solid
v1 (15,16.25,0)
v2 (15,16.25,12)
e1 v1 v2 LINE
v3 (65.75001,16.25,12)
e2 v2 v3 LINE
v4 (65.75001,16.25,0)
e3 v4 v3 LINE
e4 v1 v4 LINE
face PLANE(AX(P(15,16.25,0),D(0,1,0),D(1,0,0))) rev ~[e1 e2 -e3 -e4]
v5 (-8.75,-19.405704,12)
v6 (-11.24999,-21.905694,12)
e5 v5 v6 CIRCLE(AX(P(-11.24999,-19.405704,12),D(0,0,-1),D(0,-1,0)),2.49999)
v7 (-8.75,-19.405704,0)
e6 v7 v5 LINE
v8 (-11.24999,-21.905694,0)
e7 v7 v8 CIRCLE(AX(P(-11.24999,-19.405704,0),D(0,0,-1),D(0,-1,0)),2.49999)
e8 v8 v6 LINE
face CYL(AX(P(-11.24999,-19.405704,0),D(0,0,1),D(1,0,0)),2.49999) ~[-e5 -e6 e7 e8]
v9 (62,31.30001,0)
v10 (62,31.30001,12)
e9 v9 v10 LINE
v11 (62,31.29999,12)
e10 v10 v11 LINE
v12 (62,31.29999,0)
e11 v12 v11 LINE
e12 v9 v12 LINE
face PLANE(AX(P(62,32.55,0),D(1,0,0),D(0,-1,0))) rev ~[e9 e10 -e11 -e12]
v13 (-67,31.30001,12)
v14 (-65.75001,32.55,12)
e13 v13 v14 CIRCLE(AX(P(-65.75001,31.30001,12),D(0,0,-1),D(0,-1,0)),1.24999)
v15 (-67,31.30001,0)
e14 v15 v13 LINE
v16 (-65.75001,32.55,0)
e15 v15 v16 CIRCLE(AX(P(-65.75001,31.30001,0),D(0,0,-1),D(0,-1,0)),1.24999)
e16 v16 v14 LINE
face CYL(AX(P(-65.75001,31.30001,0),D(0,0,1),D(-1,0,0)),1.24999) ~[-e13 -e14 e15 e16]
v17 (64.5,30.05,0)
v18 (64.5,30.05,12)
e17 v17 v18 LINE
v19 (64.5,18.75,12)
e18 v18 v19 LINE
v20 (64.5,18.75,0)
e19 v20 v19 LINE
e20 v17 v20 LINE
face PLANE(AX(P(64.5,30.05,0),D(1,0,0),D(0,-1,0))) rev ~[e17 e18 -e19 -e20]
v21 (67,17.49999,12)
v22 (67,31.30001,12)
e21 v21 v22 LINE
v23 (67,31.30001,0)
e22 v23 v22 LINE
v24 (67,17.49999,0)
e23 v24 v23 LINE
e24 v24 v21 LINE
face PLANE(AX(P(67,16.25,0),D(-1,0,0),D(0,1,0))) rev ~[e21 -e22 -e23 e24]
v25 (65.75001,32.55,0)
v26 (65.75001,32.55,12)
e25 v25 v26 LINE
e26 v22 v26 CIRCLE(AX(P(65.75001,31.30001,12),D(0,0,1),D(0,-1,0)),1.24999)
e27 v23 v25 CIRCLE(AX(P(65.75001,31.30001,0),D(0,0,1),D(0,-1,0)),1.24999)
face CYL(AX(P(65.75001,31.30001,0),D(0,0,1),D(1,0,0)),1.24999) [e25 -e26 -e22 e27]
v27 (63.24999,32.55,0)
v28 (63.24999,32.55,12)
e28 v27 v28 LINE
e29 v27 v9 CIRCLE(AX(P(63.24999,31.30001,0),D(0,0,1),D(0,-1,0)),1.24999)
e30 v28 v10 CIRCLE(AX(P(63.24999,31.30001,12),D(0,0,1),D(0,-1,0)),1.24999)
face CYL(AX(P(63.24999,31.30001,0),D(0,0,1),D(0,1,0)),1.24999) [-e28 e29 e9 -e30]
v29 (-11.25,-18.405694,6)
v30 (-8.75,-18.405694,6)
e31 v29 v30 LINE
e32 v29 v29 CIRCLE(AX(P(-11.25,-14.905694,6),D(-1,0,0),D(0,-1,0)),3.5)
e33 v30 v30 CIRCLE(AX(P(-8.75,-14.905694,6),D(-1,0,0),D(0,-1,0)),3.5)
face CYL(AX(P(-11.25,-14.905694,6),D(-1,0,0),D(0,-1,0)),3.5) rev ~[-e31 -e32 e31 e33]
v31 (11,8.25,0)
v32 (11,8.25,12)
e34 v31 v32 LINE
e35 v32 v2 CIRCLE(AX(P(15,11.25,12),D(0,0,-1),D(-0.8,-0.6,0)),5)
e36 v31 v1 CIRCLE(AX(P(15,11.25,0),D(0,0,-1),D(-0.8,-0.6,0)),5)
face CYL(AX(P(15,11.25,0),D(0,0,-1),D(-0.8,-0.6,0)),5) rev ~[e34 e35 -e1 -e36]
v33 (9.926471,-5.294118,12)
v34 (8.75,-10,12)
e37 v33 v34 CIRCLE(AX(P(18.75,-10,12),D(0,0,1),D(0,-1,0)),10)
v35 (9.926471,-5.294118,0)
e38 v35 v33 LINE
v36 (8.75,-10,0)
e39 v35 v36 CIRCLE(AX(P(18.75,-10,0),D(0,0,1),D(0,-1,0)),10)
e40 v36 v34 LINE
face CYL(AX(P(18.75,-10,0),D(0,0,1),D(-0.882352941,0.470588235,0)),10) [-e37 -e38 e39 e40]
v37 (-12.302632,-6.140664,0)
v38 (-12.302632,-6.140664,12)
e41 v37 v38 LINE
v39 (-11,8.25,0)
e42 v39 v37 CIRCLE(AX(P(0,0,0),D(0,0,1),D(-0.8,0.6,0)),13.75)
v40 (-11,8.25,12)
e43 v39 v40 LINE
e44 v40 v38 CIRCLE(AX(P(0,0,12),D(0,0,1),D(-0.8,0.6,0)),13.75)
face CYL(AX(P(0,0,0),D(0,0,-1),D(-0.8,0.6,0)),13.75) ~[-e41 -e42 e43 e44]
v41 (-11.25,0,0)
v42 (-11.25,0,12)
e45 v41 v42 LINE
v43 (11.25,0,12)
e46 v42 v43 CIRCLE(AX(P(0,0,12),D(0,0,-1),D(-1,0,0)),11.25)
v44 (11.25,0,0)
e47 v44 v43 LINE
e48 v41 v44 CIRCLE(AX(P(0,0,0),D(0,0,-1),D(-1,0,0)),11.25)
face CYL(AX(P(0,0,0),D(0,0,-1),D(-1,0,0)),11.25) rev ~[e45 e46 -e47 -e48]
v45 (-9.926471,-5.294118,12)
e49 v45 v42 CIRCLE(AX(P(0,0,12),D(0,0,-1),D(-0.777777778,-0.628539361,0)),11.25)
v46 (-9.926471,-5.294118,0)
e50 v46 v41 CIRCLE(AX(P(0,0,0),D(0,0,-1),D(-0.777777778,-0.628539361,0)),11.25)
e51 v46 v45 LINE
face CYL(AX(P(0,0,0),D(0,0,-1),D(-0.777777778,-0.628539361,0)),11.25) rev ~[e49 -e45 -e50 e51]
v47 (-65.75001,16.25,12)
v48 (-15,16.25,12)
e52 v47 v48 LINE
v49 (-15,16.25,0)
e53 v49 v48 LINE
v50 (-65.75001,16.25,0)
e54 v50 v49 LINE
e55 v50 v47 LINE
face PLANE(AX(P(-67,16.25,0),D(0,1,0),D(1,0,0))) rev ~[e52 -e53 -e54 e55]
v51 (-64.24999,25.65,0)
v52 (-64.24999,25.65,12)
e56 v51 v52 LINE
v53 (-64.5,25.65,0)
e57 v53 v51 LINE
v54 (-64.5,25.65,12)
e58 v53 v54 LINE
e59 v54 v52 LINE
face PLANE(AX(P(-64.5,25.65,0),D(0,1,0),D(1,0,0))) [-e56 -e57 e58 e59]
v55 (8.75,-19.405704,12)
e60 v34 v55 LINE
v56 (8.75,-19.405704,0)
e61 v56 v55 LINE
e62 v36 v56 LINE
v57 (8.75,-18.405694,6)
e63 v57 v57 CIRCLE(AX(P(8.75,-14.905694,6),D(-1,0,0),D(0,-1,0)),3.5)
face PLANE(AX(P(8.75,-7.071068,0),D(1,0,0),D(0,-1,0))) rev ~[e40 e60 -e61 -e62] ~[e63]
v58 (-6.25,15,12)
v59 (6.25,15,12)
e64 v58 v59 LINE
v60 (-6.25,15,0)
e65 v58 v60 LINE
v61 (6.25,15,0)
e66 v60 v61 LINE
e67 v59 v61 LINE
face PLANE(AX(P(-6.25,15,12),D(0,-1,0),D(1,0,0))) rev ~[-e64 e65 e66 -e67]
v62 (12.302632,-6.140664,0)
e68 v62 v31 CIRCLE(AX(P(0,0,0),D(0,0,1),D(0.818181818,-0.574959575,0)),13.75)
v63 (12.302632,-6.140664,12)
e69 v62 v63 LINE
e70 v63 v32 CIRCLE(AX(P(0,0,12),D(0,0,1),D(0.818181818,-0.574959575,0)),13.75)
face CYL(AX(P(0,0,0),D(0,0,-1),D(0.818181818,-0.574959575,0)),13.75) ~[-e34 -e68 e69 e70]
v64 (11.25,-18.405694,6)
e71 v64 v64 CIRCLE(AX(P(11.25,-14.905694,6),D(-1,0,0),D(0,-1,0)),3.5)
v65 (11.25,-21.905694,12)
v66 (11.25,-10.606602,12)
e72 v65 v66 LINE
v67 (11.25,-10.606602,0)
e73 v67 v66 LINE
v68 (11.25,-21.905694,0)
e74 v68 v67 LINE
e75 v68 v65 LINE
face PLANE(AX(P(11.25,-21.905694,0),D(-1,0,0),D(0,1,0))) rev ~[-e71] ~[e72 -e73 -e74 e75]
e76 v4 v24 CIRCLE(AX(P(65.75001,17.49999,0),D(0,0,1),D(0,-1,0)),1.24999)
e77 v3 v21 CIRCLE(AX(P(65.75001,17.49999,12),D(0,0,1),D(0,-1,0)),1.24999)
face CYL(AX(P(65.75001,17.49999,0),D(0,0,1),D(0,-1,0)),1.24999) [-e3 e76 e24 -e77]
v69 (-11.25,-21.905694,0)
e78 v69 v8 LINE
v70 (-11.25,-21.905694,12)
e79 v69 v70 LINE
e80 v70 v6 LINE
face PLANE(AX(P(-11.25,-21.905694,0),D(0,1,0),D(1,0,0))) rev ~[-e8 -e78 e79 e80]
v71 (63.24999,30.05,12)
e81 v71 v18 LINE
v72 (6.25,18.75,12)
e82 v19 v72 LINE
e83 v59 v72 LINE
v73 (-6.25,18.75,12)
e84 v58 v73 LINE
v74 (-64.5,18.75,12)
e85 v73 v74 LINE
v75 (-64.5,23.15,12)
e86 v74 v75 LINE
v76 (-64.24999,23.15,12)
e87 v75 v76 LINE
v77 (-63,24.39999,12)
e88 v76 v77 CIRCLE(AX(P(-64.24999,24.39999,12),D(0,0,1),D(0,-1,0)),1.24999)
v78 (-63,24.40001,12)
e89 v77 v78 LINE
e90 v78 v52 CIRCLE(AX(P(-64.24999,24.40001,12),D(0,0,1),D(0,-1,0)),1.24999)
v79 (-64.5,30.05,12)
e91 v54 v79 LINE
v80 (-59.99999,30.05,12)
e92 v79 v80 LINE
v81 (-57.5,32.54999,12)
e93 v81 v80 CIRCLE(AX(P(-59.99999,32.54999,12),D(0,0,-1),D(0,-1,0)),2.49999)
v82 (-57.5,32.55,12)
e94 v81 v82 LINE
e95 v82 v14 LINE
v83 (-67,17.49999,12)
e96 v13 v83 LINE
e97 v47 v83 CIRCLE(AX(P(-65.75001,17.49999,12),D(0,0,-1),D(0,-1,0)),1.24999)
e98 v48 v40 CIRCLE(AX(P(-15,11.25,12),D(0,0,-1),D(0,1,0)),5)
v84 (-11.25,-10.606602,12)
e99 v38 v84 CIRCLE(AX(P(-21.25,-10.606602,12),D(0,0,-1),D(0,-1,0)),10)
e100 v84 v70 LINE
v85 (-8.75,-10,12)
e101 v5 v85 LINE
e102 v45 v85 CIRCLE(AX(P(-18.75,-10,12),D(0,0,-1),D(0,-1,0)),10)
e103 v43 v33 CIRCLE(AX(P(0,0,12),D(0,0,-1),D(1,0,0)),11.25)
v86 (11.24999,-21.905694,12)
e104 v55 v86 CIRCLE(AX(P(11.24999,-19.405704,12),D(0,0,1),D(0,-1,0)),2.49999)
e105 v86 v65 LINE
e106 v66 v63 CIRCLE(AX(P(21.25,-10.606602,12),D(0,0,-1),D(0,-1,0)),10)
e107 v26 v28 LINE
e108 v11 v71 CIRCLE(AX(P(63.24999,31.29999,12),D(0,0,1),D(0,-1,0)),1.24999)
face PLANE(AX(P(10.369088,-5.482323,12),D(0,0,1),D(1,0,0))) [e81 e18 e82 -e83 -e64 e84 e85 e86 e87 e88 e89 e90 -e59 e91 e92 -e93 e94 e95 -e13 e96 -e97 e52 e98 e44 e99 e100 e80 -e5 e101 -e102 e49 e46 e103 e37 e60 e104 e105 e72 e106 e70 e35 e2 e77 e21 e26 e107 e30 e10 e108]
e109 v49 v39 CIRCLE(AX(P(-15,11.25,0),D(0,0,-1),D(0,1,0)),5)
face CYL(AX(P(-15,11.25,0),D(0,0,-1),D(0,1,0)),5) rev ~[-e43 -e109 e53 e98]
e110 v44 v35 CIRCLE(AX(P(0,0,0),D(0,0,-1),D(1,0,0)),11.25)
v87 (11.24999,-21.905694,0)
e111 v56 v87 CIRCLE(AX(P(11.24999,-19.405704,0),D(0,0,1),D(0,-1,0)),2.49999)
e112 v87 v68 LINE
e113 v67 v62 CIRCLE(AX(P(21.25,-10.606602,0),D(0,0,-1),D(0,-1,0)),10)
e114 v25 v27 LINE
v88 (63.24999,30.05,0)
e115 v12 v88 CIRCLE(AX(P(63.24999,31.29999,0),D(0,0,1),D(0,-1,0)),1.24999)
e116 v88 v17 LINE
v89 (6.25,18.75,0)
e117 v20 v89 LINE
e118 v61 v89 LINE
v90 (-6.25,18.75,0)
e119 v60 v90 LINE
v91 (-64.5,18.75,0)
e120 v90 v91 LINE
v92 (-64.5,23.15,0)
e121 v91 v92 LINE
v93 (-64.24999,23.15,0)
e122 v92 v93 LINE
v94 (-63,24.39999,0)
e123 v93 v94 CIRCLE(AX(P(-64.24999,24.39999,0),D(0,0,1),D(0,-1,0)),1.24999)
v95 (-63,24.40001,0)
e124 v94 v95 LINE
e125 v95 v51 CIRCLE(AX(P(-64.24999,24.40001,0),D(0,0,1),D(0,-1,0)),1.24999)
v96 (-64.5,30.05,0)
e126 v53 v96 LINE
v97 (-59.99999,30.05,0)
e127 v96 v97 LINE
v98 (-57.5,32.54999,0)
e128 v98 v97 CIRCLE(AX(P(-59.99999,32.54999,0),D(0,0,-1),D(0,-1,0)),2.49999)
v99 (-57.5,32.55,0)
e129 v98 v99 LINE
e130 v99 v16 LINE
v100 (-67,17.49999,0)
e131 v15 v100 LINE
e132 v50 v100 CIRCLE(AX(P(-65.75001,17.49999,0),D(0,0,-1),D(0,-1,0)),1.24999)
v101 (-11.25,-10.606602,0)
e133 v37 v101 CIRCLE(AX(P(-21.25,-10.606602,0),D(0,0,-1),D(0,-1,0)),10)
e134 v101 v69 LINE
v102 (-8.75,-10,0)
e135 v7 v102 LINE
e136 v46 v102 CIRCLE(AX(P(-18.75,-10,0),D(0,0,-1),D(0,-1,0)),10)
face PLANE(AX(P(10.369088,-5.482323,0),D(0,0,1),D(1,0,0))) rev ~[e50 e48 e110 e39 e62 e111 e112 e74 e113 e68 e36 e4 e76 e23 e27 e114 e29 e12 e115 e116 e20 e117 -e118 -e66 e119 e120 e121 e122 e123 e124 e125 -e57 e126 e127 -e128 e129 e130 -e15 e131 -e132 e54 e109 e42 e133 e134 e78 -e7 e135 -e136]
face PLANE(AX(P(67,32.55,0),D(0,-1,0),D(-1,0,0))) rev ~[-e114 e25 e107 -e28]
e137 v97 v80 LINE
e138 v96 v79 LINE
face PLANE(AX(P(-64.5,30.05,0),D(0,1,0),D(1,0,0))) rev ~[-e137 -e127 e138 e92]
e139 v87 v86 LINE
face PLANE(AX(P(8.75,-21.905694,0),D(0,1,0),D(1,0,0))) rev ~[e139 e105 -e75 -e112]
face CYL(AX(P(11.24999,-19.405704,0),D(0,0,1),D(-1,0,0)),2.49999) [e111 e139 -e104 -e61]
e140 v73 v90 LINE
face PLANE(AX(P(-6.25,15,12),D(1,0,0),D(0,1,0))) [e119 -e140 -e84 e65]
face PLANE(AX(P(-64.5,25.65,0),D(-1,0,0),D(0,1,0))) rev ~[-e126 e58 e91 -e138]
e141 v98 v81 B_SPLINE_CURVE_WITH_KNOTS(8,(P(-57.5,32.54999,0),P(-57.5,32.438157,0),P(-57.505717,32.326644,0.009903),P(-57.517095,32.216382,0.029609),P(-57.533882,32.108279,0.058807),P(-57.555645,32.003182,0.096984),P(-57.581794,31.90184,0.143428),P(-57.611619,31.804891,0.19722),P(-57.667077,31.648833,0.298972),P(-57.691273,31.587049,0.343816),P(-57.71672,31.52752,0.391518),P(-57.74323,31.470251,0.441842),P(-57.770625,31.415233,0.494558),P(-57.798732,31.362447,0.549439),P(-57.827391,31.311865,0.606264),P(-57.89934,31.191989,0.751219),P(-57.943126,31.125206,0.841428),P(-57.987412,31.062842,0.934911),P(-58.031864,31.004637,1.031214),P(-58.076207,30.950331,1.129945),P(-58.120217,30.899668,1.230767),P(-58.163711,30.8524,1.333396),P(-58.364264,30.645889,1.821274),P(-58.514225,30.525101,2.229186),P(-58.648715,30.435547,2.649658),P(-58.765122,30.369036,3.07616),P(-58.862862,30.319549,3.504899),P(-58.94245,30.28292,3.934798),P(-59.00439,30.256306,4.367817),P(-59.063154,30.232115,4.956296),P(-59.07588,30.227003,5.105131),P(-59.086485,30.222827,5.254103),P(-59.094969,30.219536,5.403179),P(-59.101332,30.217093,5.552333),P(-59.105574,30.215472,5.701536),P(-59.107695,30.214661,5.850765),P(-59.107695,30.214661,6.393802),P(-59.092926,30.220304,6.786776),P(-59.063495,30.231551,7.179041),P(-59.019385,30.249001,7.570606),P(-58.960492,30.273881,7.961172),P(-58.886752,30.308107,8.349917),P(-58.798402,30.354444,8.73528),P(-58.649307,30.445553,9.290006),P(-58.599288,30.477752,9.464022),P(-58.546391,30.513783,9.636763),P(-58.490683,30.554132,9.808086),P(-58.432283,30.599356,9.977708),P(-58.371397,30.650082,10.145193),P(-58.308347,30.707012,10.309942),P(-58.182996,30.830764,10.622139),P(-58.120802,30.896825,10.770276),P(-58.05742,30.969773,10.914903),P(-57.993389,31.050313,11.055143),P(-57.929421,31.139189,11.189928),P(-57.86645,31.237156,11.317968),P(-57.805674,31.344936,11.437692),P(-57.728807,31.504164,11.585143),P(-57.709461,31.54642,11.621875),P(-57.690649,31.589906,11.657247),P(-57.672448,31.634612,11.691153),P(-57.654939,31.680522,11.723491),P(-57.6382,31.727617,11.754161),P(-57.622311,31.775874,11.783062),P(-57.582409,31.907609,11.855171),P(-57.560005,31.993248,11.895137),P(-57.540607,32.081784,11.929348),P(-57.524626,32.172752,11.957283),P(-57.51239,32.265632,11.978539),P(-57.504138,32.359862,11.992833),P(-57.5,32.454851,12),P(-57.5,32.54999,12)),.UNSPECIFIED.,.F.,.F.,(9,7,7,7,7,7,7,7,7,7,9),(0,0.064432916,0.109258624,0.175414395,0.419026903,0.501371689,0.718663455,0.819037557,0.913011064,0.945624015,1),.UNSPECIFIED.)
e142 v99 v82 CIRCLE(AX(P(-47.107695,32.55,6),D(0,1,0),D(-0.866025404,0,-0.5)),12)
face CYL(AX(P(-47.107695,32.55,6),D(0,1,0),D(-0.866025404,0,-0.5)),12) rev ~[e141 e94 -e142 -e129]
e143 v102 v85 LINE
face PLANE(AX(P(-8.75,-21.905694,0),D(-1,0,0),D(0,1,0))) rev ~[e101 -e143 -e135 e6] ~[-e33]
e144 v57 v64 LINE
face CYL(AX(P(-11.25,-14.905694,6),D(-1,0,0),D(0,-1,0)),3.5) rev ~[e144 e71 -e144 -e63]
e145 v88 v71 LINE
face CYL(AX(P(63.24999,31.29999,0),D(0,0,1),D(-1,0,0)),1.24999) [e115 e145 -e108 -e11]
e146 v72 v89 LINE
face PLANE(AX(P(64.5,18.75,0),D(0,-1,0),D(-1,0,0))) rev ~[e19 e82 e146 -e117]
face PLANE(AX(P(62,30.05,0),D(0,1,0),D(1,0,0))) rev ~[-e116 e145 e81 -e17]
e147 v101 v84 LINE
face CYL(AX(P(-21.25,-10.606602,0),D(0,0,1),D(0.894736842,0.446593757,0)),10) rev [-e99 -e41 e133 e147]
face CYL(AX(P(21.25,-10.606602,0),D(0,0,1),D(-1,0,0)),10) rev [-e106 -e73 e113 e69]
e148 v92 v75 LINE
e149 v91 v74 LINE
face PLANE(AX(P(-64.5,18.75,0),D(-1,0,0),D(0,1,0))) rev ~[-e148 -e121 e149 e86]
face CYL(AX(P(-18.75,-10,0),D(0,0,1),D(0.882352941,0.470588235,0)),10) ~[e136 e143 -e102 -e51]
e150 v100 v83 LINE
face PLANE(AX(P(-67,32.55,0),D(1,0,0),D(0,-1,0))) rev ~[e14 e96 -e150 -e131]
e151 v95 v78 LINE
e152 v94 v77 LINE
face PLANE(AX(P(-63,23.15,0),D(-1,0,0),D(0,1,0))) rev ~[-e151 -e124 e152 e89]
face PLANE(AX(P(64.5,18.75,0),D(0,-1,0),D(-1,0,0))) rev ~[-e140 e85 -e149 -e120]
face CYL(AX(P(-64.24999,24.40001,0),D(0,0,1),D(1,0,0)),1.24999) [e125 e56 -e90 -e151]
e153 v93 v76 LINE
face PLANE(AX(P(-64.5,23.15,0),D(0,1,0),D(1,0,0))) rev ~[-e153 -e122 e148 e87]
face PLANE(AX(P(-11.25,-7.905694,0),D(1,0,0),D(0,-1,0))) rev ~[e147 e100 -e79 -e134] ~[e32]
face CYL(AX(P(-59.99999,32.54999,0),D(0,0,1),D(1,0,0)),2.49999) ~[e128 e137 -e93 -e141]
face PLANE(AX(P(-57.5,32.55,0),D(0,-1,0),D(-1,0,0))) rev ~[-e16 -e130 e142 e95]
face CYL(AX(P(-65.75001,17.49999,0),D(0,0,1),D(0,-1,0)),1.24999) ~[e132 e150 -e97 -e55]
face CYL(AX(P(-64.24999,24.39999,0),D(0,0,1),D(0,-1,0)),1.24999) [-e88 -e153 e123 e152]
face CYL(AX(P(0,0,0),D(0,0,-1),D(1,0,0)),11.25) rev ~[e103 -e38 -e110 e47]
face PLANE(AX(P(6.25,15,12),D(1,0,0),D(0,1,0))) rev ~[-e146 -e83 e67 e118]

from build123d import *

# Parameters (mm, degrees)
F0_W      = 1.5
F0_H      = 2.5
F1_DEPTH  = 12
F2_R      = 3.5
F3_DEPTH  = 22.5
F4_R      = 10
F5_R      = 2.49999
F6_R      = 1.24999
F7_W      = 12.5
F7_H      = 3.75
F8_DEPTH  = 12
F10_DEPTH = 2.5


# Not quite as in the source:
# - a fillet or chamfer is up to 0.001 mm smaller than in the source, because OpenCascade refuses the exact size


with BuildPart() as f1:
    # F0 (on Top) → F1 (new body)
    with BuildSketch(Plane.XY):
        with BuildLine():
            ThreePointArc((11.25, 0), (10.6066017178, -3.75), (8.75, -7.0710678119))
            Line((8.75, -7.0710678119), (8.75, -10.6066017178))
            ThreePointArc((8.75, -10.6066017178), (10.0907742727, -9.3401699437), (11.25, -7.9056941504))
            Line((11.25, -7.9056941504), (11.25, 0))
        make_face()
        with BuildLine():
            ThreePointArc((-11.25, 0), (0, 11.25), (11.25, 0))
            Line((11.25, 0), (11.25, -7.9056941504))
            ThreePointArc((11.25, -7.9056941504), (13.748354024, 0.2127478073), (11, 8.25))
            ThreePointArc((11, 8.25), (0, 13.75), (-11, 8.25))
            ThreePointArc((-11, 8.25), (-13.748354024, 0.2127478073), (-11.25, -7.9056941504))
            Line((-11.25, -7.9056941504), (-11.25, 0))
        make_face()
        with BuildLine():
            ThreePointArc((11.25, -7.9056941504), (10.0907742727, -9.3401699437), (8.75, -10.6066017178))
            Line((8.75, -10.6066017178), (8.75, -21.9056941504))
            Line((8.75, -21.9056941504), (11.25, -21.9056941504))
            Line((11.25, -21.9056941504), (11.25, -7.9056941504))
        make_face()
        with BuildLine():
            ThreePointArc((-8.75, -7.0710678119), (-10.6066017178, -3.75), (-11.25, 0))
            Line((-11.25, 0), (-11.25, -7.9056941504))
            ThreePointArc((-11.25, -7.9056941504), (-10.0907742727, -9.3401699437), (-8.75, -10.6066017178))
            Line((-8.75, -10.6066017178), (-8.75, -7.0710678119))
        make_face()
        with BuildLine():
            ThreePointArc((-8.75, -10.6066017178), (-10.0907742727, -9.3401699437), (-11.25, -7.9056941504))
            Line((-11.25, -7.9056941504), (-11.25, -21.9056941504))
            Line((-11.25, -21.9056941504), (-8.75, -21.9056941504))
            Line((-8.75, -21.9056941504), (-8.75, -10.6066017178))
        make_face()
        with BuildLine():
            ThreePointArc((-11, 8.25), (0, 13.75), (11, 8.25))
            ThreePointArc((11, 8.25), (10.527864045, 13.4860679775), (15, 16.25))
            Line((15, 16.25), (-15, 16.25))
            ThreePointArc((-15, 16.25), (-10.527864045, 13.4860679775), (-11, 8.25))
        make_face()
        Polygon((-15, 16.25), (15, 16.25), (64.5, 16.25), (64.5, 18.75), (0, 18.75), (-64.5, 18.75), (-64.5, 23.15), (-64.5, 25.65), (-64.5, 30.05), (-67, 30.05), (-67, 16.25), (-64.5, 16.25), align=None)
        Polygon((64.5, 18.75), (64.5, 16.25), (67, 16.25), (67, 30.05), (64.5, 30.05), align=None)
        Polygon((62, 30.05), (64.5, 30.05), (67, 30.05), (67, 32.55), (62, 32.55), align=None)
        Polygon((-67, 32.55), (-67, 30.05), (-64.5, 30.05), (-57.5, 30.05), (-57.5, 32.55), align=None)
        with Locations((-63.75, 24.4)):
            Rectangle(F0_W, F0_H)
    extrude(amount=F1_DEPTH)

    # F2 (on face) → F3 (cut, through all)
    with BuildSketch(Plane(origin=(-11.25, 0, 0), x_dir=(0, -1, 0), z_dir=(-1, 0, 0))):
        with Locations((14.9056941504, 6)):
            Circle(F2_R)
    extrude(amount=-F3_DEPTH, mode=Mode.SUBTRACT)

    # F4
    f4_edges = [f1.edges().sort_by_distance(p)[0] for p in [
        (-8.75, -7.071068, 6),
        (8.75, -7.071068, 6),
        (-11.25, -7.905694, 6),
        (11.25, -7.905694, 6),
    ]]
    fillet(f4_edges, radius=F4_R)

    # F5 (radius 2.5 in the source; OpenCascade refuses exactly that, so slightly less here)
    f5_edges = [f1.edges().sort_by_distance(p)[0] for p in [
        (-57.5, 30.05, 6),
        (-8.75, -21.905694, 6),
        (8.75, -21.905694, 6),
    ]]
    fillet(f5_edges, radius=F5_R)

    # F6 (radius 1.25 in the source; OpenCascade refuses exactly that, so slightly less here)
    f6_edges = [f1.edges().sort_by_distance(p)[0] for p in [
        (-67, 32.55, 6),
        (-67, 16.25, 6),
        (67, 16.25, 6),
        (-63, 23.15, 6),
        (-63, 25.65, 6),
        (62, 32.55, 6),
        (62, 30.05, 6),
        (67, 32.55, 6),
    ]]
    fillet(f6_edges, radius=F6_R)

    # F7 (on face) → F8 (cut, through all)
    with BuildSketch(Plane.XY.offset(12)):
        with Locations((0, 16.875)):
            Rectangle(F7_W, F7_H)
    extrude(amount=-F8_DEPTH, mode=Mode.SUBTRACT)

    # F9 (on face) → F10 (cut, through all)
    with BuildSketch(Plane(origin=(0, 32.55, 0), x_dir=(-1, 0, 0), z_dir=(0, 1, 0))):
        with BuildLine():
            Line((57.5, 12), (57.5, 0))
            ThreePointArc((57.5, 0), (59.1076951546, 6), (57.5, 12))
        make_face()
    extrude(amount=-F10_DEPTH, mode=Mode.SUBTRACT)


solid = f1.part
